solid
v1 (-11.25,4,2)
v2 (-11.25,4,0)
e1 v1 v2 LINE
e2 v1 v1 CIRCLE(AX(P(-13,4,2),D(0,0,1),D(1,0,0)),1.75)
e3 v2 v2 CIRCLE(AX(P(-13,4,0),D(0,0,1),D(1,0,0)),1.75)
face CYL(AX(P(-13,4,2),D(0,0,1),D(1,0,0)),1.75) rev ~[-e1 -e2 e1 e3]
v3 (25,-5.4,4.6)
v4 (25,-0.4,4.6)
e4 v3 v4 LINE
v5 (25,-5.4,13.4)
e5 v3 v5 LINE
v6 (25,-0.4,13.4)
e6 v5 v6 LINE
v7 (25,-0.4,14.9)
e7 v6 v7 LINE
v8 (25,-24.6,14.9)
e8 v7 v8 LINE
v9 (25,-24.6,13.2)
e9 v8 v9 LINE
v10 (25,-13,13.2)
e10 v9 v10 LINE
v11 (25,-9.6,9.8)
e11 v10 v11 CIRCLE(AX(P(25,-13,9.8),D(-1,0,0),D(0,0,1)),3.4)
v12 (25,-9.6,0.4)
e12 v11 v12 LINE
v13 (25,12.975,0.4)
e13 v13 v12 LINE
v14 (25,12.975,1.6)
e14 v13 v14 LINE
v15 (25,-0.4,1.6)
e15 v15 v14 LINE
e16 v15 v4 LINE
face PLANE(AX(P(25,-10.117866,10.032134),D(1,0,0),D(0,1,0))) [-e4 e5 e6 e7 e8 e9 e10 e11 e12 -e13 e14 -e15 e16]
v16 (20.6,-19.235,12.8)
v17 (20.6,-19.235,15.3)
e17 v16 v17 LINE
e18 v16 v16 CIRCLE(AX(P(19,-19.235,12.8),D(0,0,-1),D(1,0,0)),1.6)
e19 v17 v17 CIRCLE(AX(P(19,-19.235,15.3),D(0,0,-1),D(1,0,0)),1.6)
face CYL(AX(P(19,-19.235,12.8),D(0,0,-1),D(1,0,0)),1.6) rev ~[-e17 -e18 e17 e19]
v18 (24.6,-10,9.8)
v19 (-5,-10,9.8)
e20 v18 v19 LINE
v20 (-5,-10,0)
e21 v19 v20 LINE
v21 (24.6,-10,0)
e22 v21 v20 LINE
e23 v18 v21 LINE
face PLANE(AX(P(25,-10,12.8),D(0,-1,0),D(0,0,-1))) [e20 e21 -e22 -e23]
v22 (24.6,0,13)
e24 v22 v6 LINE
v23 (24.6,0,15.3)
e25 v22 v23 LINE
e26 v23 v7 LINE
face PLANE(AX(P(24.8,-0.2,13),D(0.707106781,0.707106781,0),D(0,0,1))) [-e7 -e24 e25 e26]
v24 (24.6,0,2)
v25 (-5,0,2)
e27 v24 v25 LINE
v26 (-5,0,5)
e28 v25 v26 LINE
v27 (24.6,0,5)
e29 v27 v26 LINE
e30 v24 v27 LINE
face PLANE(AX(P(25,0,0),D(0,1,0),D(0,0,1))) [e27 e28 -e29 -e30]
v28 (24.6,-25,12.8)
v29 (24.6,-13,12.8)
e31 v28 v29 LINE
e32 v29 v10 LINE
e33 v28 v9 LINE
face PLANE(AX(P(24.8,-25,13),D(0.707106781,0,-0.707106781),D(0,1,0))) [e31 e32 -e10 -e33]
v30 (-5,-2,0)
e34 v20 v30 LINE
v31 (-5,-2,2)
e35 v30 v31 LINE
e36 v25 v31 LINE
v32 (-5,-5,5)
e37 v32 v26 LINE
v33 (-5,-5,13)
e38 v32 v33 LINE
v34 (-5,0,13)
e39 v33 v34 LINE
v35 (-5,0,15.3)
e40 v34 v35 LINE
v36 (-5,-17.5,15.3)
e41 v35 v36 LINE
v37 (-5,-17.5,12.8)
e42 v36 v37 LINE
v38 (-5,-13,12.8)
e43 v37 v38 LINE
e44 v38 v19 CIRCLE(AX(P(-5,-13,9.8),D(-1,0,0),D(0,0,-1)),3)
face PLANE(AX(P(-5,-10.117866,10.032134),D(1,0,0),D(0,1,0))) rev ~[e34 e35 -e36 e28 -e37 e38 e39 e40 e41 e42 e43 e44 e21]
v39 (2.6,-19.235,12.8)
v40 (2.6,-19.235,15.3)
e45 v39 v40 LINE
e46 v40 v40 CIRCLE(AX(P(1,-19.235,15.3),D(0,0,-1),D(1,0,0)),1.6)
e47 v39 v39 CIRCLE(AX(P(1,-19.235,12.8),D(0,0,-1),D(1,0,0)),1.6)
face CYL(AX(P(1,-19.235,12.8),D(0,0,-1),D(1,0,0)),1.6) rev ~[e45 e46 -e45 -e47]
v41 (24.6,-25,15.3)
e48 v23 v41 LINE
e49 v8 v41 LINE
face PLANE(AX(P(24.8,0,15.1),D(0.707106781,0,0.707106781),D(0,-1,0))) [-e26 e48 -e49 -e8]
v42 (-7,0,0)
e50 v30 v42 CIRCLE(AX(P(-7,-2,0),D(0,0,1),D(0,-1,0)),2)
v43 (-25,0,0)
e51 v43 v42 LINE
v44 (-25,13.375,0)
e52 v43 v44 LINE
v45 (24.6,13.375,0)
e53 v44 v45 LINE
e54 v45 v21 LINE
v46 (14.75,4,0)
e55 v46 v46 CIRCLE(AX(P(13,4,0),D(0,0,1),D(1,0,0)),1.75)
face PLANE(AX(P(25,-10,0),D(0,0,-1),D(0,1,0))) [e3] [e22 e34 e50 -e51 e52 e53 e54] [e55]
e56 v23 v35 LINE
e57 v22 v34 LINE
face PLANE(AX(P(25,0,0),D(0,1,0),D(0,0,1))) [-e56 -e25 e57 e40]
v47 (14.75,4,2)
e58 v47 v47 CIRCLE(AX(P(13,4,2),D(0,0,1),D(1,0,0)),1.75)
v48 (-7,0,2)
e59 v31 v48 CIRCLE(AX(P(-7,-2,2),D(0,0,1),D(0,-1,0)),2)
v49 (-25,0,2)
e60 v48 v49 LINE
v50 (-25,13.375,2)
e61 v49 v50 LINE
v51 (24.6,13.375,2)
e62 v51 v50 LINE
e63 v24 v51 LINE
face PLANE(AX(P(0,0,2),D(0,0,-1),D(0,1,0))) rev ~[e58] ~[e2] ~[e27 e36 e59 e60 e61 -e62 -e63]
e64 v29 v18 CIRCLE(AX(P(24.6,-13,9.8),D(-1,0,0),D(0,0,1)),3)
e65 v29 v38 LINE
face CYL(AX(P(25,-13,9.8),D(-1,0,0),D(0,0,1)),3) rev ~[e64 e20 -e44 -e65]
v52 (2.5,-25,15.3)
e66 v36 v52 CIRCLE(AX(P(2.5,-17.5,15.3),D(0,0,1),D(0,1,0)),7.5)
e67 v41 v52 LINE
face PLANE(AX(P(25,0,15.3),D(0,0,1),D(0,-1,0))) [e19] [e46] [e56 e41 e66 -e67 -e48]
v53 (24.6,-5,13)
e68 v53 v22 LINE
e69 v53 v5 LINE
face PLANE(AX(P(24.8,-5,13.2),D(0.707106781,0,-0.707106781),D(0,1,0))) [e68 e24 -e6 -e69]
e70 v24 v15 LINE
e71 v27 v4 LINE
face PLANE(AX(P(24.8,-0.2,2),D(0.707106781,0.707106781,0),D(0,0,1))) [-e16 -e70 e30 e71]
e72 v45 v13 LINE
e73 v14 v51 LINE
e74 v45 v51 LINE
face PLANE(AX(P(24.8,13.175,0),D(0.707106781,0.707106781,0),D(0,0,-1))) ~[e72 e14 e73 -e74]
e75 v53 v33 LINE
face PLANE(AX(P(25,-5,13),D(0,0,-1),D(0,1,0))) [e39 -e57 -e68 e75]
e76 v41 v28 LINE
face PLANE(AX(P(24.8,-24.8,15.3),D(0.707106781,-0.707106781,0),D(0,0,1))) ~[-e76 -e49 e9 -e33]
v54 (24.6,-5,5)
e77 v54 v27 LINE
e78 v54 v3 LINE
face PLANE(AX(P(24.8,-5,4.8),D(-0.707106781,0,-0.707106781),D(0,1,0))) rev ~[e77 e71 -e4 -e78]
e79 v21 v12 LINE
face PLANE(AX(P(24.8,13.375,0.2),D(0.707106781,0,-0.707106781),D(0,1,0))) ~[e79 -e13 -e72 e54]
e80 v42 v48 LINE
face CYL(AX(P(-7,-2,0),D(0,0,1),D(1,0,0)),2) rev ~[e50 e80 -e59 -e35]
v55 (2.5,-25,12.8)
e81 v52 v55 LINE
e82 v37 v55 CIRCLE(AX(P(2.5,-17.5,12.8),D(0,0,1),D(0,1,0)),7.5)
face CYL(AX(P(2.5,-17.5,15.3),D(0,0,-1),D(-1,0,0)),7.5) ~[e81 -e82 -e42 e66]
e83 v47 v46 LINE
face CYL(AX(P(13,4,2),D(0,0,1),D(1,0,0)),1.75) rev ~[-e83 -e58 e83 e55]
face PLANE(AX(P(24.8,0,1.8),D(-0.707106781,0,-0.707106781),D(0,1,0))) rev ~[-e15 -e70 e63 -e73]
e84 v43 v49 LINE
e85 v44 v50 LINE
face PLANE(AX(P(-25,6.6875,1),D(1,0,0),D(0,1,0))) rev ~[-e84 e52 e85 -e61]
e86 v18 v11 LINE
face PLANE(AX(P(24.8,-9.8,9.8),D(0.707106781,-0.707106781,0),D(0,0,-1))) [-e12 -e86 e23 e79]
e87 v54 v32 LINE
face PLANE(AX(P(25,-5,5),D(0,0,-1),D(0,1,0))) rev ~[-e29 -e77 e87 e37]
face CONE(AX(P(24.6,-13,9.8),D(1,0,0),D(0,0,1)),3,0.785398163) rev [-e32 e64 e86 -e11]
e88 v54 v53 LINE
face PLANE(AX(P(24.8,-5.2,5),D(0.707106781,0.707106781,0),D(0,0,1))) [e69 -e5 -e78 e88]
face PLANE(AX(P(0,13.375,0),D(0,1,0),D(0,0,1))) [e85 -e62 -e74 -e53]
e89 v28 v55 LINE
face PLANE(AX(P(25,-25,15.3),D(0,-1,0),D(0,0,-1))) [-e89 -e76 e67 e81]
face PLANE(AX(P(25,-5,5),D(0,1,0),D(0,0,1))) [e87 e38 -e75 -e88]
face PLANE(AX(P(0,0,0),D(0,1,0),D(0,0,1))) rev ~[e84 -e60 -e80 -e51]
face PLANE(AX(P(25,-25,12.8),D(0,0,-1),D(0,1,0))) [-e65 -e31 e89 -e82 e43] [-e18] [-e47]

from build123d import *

# Parameters (mm, degrees)
F0_W     = 13.375
F0_H     = 2
F1_DEPTH = 25
F2_R     = 1.75
F3_DEPTH = 2
F5_DEPTH = 30
F6_W     = 5
F6_H     = 8
F7_DEPTH = 50.001
F8_R     = 1.6
F9_DEPTH = 2.5
F10_R    = 7.5
F11_R    = 3
F12_R    = 2
F13_SIZE = 0.4


with BuildPart() as f1:
    # F0 (on Right) → F1 (new body, symmetric)
    with BuildSketch(Plane.YZ):
        with Locations((6.6875, 1)):
            Rectangle(F0_W, F0_H)
    extrude(amount=F1_DEPTH, both=True)

    # F2 (on face) → F3 (cut, through all)
    with BuildSketch(Plane.XY.offset(2)):
        with Locations((-13, 4)):
            Circle(F2_R)
        with Locations((13, 4)):
            Circle(F2_R)
    extrude(amount=-F3_DEPTH, mode=Mode.SUBTRACT)

    # F4 (on face) → F5 (join)
    with BuildSketch(Plane.YZ.offset(25)):
        Polygon((-10, 0), (0, 0), (0, 15.3), (-25, 15.3), (-25, 12.8), (-10, 12.8), align=None)
    extrude(amount=-F5_DEPTH)

    # F6 (on face) → F7 (cut, through all)
    with BuildSketch(Plane.YZ.offset(25)):
        with Locations((-2.5, 9)):
            Rectangle(F6_W, F6_H)
    extrude(amount=-F7_DEPTH, mode=Mode.SUBTRACT)

    # F8 (on face) → F9 (cut, through all)
    with BuildSketch(Plane(origin=(0, 0, 12.8), x_dir=(1, 0, 0), z_dir=(0, 0, -1))):
        with Locations((1, 19.235)):
            Circle(F8_R)
        with Locations((19, 19.235)):
            Circle(F8_R)
    extrude(amount=-F9_DEPTH, mode=Mode.SUBTRACT)

    # F10
    f10_edges = [f1.edges().sort_by_distance(p)[0] for p in [
        (-5, -25, 14.05),
    ]]
    fillet(f10_edges, radius=F10_R)

    # F11
    f11_edges = [f1.edges().sort_by_distance(p)[0] for p in [
        (10, -10, 12.8),
    ]]
    fillet(f11_edges, radius=F11_R)

    # F12
    f12_edges = [f1.edges().sort_by_distance(p)[0] for p in [
        (-5, 0, 1),
    ]]
    fillet(f12_edges, radius=F12_R)

    # F13
    f13_edges = [f1.edges().sort_by_distance(p)[0] for p in [
        (25, -10, 4.9),
        (25, -10.87868, 11.92132),
        (25, 1.6875, 0),
        (25, -19, 12.8),
        (25, 13.375, 1),
        (25, -25, 14.05),
        (25, 6.6875, 2),
        (25, -12.5, 15.3),
        (25, 0, 3.5),
        (25, 0, 14.15),
        (25, -2.5, 5),
        (25, -2.5, 13),
        (25, -5, 9),
    ]]
    chamfer(f13_edges, length=F13_SIZE)


solid = f1.part
